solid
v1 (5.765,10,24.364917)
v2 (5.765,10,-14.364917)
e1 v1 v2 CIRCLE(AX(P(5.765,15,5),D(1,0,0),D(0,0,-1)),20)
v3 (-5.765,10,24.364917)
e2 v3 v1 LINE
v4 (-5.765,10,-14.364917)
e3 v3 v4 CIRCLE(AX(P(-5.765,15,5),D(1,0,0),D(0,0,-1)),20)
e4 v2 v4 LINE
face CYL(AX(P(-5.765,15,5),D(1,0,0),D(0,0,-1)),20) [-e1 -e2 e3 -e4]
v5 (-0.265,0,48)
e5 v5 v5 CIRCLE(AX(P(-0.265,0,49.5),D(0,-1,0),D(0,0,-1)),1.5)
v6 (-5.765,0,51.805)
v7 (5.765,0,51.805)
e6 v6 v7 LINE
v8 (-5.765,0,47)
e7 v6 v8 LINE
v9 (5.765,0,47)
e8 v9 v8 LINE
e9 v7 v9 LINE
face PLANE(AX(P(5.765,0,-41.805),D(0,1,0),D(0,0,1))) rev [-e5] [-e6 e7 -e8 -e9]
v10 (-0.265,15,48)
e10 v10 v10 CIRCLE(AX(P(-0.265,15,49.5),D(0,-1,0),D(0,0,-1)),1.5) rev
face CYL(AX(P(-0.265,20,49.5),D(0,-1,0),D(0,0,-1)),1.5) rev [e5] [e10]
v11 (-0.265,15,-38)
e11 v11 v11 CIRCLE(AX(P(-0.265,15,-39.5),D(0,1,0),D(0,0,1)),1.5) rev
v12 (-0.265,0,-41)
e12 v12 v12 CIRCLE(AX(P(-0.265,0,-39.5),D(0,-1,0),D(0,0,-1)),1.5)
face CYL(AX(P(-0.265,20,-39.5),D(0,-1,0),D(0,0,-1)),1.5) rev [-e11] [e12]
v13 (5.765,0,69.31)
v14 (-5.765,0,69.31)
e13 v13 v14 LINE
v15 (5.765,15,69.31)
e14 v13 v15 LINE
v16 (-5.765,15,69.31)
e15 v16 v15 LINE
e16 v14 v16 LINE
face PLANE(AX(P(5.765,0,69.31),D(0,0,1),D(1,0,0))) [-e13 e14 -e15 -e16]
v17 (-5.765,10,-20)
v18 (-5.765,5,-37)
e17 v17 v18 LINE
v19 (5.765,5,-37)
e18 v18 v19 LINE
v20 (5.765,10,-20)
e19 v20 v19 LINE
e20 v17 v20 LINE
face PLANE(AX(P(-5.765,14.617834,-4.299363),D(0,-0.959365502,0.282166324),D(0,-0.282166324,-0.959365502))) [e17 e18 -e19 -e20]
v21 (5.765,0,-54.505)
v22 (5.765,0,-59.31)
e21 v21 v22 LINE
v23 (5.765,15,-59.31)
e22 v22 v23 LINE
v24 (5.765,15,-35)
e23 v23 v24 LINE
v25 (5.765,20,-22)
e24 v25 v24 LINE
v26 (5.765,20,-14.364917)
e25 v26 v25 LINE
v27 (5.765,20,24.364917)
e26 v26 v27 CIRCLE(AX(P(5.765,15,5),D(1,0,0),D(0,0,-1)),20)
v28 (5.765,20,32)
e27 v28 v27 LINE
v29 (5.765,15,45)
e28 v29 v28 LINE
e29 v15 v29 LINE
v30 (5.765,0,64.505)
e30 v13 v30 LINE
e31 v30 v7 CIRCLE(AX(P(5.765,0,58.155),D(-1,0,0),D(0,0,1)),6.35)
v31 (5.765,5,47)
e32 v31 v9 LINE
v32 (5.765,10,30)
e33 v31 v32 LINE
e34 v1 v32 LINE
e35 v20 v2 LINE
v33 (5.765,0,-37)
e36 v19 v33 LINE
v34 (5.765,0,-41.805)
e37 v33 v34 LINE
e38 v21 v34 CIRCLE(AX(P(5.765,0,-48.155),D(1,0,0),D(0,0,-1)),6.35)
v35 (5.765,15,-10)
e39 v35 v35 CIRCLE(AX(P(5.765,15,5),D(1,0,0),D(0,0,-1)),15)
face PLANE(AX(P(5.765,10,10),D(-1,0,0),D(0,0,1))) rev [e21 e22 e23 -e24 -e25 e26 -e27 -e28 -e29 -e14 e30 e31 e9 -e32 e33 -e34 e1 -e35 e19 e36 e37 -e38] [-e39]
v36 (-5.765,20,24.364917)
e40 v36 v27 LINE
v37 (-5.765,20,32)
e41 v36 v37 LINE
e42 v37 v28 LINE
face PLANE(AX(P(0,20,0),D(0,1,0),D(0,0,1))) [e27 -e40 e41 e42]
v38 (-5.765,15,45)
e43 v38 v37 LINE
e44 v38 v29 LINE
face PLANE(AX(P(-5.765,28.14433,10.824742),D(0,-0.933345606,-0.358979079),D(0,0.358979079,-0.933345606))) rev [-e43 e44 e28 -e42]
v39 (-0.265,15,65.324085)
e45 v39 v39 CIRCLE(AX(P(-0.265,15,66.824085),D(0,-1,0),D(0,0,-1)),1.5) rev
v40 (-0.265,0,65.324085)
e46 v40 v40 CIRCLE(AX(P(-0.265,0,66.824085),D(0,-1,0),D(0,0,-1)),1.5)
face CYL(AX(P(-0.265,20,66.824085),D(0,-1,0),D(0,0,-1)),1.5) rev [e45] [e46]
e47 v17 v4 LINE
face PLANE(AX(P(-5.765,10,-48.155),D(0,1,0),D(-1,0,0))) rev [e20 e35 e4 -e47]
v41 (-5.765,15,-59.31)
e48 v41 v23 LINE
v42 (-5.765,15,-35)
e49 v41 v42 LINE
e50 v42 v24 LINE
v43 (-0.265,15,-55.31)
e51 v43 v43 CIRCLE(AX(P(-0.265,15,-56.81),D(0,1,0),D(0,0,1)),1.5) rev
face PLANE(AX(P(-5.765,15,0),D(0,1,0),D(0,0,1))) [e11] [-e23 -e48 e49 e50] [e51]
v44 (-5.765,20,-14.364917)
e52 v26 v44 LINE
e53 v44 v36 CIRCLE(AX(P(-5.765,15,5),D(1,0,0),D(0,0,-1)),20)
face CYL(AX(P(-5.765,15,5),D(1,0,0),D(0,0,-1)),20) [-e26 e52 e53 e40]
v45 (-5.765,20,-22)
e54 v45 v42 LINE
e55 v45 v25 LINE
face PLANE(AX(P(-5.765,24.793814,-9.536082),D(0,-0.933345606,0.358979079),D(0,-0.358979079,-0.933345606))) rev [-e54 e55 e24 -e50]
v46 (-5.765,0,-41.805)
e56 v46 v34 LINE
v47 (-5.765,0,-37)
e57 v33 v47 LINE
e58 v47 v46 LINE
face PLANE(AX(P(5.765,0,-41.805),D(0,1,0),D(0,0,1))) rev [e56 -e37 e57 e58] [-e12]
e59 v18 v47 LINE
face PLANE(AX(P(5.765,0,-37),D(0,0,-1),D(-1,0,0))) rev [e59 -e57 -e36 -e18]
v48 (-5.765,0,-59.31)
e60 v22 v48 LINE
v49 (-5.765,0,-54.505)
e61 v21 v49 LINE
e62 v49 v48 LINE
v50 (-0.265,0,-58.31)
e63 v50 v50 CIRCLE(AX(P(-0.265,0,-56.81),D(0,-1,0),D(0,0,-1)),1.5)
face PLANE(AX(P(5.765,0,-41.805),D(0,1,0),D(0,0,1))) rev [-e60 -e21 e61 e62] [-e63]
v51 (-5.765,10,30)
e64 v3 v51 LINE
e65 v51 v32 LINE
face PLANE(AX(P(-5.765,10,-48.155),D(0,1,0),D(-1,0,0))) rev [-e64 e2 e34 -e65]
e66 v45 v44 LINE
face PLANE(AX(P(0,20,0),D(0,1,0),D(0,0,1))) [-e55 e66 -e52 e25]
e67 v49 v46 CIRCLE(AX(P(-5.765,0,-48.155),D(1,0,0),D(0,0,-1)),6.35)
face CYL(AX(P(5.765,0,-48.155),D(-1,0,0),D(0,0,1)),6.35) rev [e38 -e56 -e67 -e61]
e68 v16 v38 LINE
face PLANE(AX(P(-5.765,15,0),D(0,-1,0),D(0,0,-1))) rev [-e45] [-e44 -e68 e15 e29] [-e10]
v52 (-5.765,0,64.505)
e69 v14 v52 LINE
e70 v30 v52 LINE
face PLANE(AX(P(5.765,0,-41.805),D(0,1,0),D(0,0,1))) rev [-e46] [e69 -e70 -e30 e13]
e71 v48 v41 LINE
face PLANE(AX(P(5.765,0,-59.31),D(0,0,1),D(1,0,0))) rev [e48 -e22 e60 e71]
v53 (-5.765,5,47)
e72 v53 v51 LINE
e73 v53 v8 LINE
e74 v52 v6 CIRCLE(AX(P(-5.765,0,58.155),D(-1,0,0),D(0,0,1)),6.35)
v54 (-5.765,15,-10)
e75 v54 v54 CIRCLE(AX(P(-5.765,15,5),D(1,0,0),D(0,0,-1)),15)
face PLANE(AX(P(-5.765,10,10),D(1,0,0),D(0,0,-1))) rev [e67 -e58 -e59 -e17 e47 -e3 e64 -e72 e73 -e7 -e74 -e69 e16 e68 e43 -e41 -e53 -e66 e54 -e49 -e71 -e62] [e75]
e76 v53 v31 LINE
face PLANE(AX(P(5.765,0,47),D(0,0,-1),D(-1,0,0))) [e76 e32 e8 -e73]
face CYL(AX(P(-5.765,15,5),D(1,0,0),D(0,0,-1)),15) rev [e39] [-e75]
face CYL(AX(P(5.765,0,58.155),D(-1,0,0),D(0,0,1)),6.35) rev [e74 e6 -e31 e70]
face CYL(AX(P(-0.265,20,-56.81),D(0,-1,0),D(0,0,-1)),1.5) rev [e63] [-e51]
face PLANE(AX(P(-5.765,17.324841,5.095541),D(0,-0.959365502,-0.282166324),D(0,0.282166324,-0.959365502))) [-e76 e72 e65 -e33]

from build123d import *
from build123d.topology import SkipClean

# Parameters (mm, degrees)
SKETCH1_R            = 5.765
SKETCH1_R_2          = 4.765
BOSS_EXTRUDE1_DEPTH  = 10
SKETCH2_W            = 11.53
SKETCH2_H            = 10
BOSS_EXTRUDE2_DEPTH  = 10
SKETCH3_R            = 4.765
CUT_EXTRUDE1_DEPTH   = 10
BOSS_EXTRUDE5_DEPTH  = 10
SKETCH9_R            = 3.5
CUT_EXTRUDE4_DEPTH   = 26.158316716
SKETCH11_W           = 11.53
SKETCH11_H           = 10
BOSS_EXTRUDE6_DEPTH  = 48.155
SKETCH12_R           = 6.35
BOSS_EXTRUDE7_DEPTH  = 5.765
SKETCH13_W           = 10
SKETCH13_H           = 20
CUT_EXTRUDE5_DEPTH   = 11.53
CUT_EXTRUDE6_DEPTH   = 11.53
SKETCH15_W           = 10
SKETCH15_H           = 10
CUT_EXTRUDE7_DEPTH   = 11.53
SKETCH17_W           = 11.204655182
SKETCH17_H           = 10
BOSS_EXTRUDE10_DEPTH = 11.53
CUT_EXTRUDE9_DEPTH   = 74.053521476
SKETCH20_R           = 1.5
CUT_EXTRUDE10_DEPTH  = 73.36788877
CUT_EXTRUDE11_DEPTH  = 74.053521476
BOSS_EXTRUDE11_DEPTH = 11.53
SKETCH25_R           = 20
SKETCH25_R_2         = 15
BOSS_EXTRUDE12_DEPTH = 11.53
SKETCH26_R           = 15
CUT_EXTRUDE12_DEPTH  = 79.49724199


with BuildPart() as part:
    # Sketch1 → Boss-Extrude1 (new body)
    with BuildSketch(Plane.XY):
        Circle(SKETCH1_R)
        Circle(SKETCH1_R_2, mode=Mode.SUBTRACT)
    extrude(amount=BOSS_EXTRUDE1_DEPTH)

    # Sketch2 → Boss-Extrude2 (add)
    with BuildSketch(Plane(origin=(0, 0, 0), x_dir=(1, 0, 0), z_dir=(0, 1, 0))):
        with Locations((0, -5)):
            Rectangle(SKETCH2_W, SKETCH2_H)
    boss_extrude2 = extrude(amount=BOSS_EXTRUDE2_DEPTH)

    # Sketch3 → Cut-Extrude1 (cut)
    with SkipClean():  # the faces are left unmerged after this step: merging them gives an invalid solid
        with BuildSketch(Plane(origin=(0, 0, 0), x_dir=(-1, 0, 0), z_dir=(0, 0, -1))):
            Circle(SKETCH3_R)
        extrude(amount=-CUT_EXTRUDE1_DEPTH, mode=Mode.SUBTRACT)

    # Sketch8 → Boss-Extrude5 (add)
    with SkipClean():  # the faces are left unmerged after this step: merging them gives an invalid solid
        with BuildSketch(Plane(origin=(0, 10, 0), x_dir=(1, 0, 0), z_dir=(0, 1, 0))):
            Polygon((-5.765, 0), (-5.765, -10), (-2.765, -10), (2.765, -10), (5.765, -10), (5.765, 0), (2.765, 0), (-2.765, 0), align=None)
        boss_extrude5 = extrude(amount=BOSS_EXTRUDE5_DEPTH)

    # Sketch9 → Cut-Extrude4 (cut, through all)
    with SkipClean():  # the faces are left unmerged after this step: merging them gives an invalid solid
        with BuildSketch(Plane(origin=(5.765, 0, 0), x_dir=(0, 0, -1), z_dir=(1, 0, 0))):
            with Locations((-5, 15)):
                Circle(SKETCH9_R)
        cut_extrude4 = extrude(amount=-CUT_EXTRUDE4_DEPTH, mode=Mode.SUBTRACT)

    # Sketch11 → Boss-Extrude6 (add)
    with SkipClean():  # the faces are left unmerged after this step: merging them gives an invalid solid
        with BuildSketch(Plane(origin=(0, 0, 0), x_dir=(-1, 0, 0), z_dir=(0, 0, -1))):
            with Locations((0, 15)):
                Rectangle(SKETCH11_W, SKETCH11_H)
        boss_extrude6 = extrude(amount=BOSS_EXTRUDE6_DEPTH)

    # Sketch12 → Boss-Extrude7 (add, symmetric)
    with SkipClean():  # the faces are left unmerged after this step: merging them gives an invalid solid
        with BuildSketch(Plane(origin=(0, 0, 0), x_dir=(0, 0, -1), z_dir=(1, 0, 0))):
            with BuildLine():
                Line((59.31, 0), (59.31, 20))
                Line((59.31, 20), (47, 20))
                Line((47, 20), (37, 20))
                Line((37, 20), (37, 0))
                ThreePointArc((37, 0), (48.155, -11.155), (59.31, 0))
            make_face()
            with Locations((48.155, 0)):
                Circle(SKETCH12_R, mode=Mode.SUBTRACT)
        boss_extrude7 = extrude(amount=BOSS_EXTRUDE7_DEPTH, both=True)

    # Sketch13 → Cut-Extrude5 (cut)
    with BuildSketch(Plane.ZY.offset(5.765)):
        with Locations((5, 0)):
            Rectangle(SKETCH13_W, SKETCH13_H)
    extrude(amount=-CUT_EXTRUDE5_DEPTH, mode=Mode.SUBTRACT)

    # Sketch14 → Cut-Extrude6 (cut)
    with BuildSketch(Plane.ZY.offset(5.765)):
        Polygon((5, 18.5), (5, 10), (10, 10), (10, 18.5), (10, 20), (5, 20), align=None)
    cut_extrude6 = extrude(amount=-CUT_EXTRUDE6_DEPTH, mode=Mode.SUBTRACT)

    # Mirror1: Boss-Extrude2, Boss-Extrude5, Cut-Extrude4, Boss-Extrude6, Boss-Extrude7, Cut-Extrude6 across plane
    add(boss_extrude2.mirror(Plane(origin=(5.765, 18.5, 5), x_dir=(1, 0, 0), z_dir=(0, 0, -1))))
    add(boss_extrude5.mirror(Plane(origin=(5.765, 18.5, 5), x_dir=(1, 0, 0), z_dir=(0, 0, -1))))
    add(cut_extrude4.mirror(Plane(origin=(5.765, 18.5, 5), x_dir=(1, 0, 0), z_dir=(0, 0, -1))), mode=Mode.SUBTRACT)
    add(boss_extrude6.mirror(Plane(origin=(5.765, 18.5, 5), x_dir=(1, 0, 0), z_dir=(0, 0, -1))))
    add(boss_extrude7.mirror(Plane(origin=(5.765, 18.5, 5), x_dir=(1, 0, 0), z_dir=(0, 0, -1))))
    add(cut_extrude6.mirror(Plane(origin=(5.765, 18.5, 5), x_dir=(1, 0, 0), z_dir=(0, 0, -1))), mode=Mode.SUBTRACT)

    # Sketch15 → Cut-Extrude7 (cut)
    with BuildSketch(Plane.ZY.offset(5.765)):
        with Locations((5, 5)):
            Rectangle(SKETCH15_W, SKETCH15_H)
    extrude(amount=-CUT_EXTRUDE7_DEPTH, mode=Mode.SUBTRACT)

    # Sketch17 → Boss-Extrude10 (add)
    with BuildSketch(Plane.ZY.offset(5.765)):
        with Locations((1.267367683, 15)):
            Rectangle(SKETCH17_W, SKETCH17_H)
    extrude(amount=-BOSS_EXTRUDE10_DEPTH)

    # Sketch19 → Cut-Extrude9 (cut, through all)
    with BuildSketch(Plane.ZY.offset(5.765)):
        Polygon((-41.805, 0), (69.31, 0), (69.31, -15), (-59.31, -15), (-59.31, 0), align=None)
    extrude(amount=-CUT_EXTRUDE9_DEPTH, mode=Mode.SUBTRACT)

    # Sketch20 → Cut-Extrude10 (cut, through all)
    with BuildSketch(Plane(origin=(0, 0, 0), x_dir=(-1, 0, 0), z_dir=(0, -1, 0))):
        with Locations((0.265, 56.81)):
            Circle(SKETCH20_R)
        with Locations((0.265, 39.5)):
            Circle(SKETCH20_R)
        with Locations((0.265, -66.824084676)):
            Circle(SKETCH20_R)
        with Locations((0.265, -49.5)):
            Circle(SKETCH20_R)
    extrude(amount=-CUT_EXTRUDE10_DEPTH, mode=Mode.SUBTRACT)

    # Sketch22 → Cut-Extrude11 (cut, through all)
    with BuildSketch(Plane(origin=(5.765, 0, 0), x_dir=(0, 0, -1), z_dir=(1, 0, 0))):
        Polygon((22, 20), (35, 15), (59.31, 15), (59.31, 20), align=None)
        Polygon((-69.31, 20), (-69.31, 15), (-45, 15), (-32, 20), align=None)
    extrude(amount=-CUT_EXTRUDE11_DEPTH, mode=Mode.SUBTRACT)

    # Sketch23 → Boss-Extrude11 (add)
    with BuildSketch(Plane(origin=(5.765, 0, 0), x_dir=(0, 0, -1), z_dir=(1, 0, 0))):
        Polygon((-47, 10), (-47, 5), (-30, 10), align=None)
        Polygon((37, 10), (20, 10), (37, 5), align=None)
    extrude(amount=-BOSS_EXTRUDE11_DEPTH)

    # Sketch25 → Boss-Extrude12 (add)
    with BuildSketch(Plane(origin=(5.765, 0, 0), x_dir=(0, 0, -1), z_dir=(1, 0, 0))):
        with Locations((-5, 15)):
            Circle(SKETCH25_R)
        with Locations((-5, 15)):
            Circle(SKETCH25_R_2, mode=Mode.SUBTRACT)
    extrude(amount=-BOSS_EXTRUDE12_DEPTH)

    # Sketch26 → Cut-Extrude12 (cut, through all)
    with BuildSketch(Plane(origin=(5.765, 0, 0), x_dir=(0, 0, -1), z_dir=(1, 0, 0))):
        with Locations((-5, 15)):
            Circle(SKETCH26_R)
    extrude(amount=-CUT_EXTRUDE12_DEPTH, mode=Mode.SUBTRACT)


solid = part.part
